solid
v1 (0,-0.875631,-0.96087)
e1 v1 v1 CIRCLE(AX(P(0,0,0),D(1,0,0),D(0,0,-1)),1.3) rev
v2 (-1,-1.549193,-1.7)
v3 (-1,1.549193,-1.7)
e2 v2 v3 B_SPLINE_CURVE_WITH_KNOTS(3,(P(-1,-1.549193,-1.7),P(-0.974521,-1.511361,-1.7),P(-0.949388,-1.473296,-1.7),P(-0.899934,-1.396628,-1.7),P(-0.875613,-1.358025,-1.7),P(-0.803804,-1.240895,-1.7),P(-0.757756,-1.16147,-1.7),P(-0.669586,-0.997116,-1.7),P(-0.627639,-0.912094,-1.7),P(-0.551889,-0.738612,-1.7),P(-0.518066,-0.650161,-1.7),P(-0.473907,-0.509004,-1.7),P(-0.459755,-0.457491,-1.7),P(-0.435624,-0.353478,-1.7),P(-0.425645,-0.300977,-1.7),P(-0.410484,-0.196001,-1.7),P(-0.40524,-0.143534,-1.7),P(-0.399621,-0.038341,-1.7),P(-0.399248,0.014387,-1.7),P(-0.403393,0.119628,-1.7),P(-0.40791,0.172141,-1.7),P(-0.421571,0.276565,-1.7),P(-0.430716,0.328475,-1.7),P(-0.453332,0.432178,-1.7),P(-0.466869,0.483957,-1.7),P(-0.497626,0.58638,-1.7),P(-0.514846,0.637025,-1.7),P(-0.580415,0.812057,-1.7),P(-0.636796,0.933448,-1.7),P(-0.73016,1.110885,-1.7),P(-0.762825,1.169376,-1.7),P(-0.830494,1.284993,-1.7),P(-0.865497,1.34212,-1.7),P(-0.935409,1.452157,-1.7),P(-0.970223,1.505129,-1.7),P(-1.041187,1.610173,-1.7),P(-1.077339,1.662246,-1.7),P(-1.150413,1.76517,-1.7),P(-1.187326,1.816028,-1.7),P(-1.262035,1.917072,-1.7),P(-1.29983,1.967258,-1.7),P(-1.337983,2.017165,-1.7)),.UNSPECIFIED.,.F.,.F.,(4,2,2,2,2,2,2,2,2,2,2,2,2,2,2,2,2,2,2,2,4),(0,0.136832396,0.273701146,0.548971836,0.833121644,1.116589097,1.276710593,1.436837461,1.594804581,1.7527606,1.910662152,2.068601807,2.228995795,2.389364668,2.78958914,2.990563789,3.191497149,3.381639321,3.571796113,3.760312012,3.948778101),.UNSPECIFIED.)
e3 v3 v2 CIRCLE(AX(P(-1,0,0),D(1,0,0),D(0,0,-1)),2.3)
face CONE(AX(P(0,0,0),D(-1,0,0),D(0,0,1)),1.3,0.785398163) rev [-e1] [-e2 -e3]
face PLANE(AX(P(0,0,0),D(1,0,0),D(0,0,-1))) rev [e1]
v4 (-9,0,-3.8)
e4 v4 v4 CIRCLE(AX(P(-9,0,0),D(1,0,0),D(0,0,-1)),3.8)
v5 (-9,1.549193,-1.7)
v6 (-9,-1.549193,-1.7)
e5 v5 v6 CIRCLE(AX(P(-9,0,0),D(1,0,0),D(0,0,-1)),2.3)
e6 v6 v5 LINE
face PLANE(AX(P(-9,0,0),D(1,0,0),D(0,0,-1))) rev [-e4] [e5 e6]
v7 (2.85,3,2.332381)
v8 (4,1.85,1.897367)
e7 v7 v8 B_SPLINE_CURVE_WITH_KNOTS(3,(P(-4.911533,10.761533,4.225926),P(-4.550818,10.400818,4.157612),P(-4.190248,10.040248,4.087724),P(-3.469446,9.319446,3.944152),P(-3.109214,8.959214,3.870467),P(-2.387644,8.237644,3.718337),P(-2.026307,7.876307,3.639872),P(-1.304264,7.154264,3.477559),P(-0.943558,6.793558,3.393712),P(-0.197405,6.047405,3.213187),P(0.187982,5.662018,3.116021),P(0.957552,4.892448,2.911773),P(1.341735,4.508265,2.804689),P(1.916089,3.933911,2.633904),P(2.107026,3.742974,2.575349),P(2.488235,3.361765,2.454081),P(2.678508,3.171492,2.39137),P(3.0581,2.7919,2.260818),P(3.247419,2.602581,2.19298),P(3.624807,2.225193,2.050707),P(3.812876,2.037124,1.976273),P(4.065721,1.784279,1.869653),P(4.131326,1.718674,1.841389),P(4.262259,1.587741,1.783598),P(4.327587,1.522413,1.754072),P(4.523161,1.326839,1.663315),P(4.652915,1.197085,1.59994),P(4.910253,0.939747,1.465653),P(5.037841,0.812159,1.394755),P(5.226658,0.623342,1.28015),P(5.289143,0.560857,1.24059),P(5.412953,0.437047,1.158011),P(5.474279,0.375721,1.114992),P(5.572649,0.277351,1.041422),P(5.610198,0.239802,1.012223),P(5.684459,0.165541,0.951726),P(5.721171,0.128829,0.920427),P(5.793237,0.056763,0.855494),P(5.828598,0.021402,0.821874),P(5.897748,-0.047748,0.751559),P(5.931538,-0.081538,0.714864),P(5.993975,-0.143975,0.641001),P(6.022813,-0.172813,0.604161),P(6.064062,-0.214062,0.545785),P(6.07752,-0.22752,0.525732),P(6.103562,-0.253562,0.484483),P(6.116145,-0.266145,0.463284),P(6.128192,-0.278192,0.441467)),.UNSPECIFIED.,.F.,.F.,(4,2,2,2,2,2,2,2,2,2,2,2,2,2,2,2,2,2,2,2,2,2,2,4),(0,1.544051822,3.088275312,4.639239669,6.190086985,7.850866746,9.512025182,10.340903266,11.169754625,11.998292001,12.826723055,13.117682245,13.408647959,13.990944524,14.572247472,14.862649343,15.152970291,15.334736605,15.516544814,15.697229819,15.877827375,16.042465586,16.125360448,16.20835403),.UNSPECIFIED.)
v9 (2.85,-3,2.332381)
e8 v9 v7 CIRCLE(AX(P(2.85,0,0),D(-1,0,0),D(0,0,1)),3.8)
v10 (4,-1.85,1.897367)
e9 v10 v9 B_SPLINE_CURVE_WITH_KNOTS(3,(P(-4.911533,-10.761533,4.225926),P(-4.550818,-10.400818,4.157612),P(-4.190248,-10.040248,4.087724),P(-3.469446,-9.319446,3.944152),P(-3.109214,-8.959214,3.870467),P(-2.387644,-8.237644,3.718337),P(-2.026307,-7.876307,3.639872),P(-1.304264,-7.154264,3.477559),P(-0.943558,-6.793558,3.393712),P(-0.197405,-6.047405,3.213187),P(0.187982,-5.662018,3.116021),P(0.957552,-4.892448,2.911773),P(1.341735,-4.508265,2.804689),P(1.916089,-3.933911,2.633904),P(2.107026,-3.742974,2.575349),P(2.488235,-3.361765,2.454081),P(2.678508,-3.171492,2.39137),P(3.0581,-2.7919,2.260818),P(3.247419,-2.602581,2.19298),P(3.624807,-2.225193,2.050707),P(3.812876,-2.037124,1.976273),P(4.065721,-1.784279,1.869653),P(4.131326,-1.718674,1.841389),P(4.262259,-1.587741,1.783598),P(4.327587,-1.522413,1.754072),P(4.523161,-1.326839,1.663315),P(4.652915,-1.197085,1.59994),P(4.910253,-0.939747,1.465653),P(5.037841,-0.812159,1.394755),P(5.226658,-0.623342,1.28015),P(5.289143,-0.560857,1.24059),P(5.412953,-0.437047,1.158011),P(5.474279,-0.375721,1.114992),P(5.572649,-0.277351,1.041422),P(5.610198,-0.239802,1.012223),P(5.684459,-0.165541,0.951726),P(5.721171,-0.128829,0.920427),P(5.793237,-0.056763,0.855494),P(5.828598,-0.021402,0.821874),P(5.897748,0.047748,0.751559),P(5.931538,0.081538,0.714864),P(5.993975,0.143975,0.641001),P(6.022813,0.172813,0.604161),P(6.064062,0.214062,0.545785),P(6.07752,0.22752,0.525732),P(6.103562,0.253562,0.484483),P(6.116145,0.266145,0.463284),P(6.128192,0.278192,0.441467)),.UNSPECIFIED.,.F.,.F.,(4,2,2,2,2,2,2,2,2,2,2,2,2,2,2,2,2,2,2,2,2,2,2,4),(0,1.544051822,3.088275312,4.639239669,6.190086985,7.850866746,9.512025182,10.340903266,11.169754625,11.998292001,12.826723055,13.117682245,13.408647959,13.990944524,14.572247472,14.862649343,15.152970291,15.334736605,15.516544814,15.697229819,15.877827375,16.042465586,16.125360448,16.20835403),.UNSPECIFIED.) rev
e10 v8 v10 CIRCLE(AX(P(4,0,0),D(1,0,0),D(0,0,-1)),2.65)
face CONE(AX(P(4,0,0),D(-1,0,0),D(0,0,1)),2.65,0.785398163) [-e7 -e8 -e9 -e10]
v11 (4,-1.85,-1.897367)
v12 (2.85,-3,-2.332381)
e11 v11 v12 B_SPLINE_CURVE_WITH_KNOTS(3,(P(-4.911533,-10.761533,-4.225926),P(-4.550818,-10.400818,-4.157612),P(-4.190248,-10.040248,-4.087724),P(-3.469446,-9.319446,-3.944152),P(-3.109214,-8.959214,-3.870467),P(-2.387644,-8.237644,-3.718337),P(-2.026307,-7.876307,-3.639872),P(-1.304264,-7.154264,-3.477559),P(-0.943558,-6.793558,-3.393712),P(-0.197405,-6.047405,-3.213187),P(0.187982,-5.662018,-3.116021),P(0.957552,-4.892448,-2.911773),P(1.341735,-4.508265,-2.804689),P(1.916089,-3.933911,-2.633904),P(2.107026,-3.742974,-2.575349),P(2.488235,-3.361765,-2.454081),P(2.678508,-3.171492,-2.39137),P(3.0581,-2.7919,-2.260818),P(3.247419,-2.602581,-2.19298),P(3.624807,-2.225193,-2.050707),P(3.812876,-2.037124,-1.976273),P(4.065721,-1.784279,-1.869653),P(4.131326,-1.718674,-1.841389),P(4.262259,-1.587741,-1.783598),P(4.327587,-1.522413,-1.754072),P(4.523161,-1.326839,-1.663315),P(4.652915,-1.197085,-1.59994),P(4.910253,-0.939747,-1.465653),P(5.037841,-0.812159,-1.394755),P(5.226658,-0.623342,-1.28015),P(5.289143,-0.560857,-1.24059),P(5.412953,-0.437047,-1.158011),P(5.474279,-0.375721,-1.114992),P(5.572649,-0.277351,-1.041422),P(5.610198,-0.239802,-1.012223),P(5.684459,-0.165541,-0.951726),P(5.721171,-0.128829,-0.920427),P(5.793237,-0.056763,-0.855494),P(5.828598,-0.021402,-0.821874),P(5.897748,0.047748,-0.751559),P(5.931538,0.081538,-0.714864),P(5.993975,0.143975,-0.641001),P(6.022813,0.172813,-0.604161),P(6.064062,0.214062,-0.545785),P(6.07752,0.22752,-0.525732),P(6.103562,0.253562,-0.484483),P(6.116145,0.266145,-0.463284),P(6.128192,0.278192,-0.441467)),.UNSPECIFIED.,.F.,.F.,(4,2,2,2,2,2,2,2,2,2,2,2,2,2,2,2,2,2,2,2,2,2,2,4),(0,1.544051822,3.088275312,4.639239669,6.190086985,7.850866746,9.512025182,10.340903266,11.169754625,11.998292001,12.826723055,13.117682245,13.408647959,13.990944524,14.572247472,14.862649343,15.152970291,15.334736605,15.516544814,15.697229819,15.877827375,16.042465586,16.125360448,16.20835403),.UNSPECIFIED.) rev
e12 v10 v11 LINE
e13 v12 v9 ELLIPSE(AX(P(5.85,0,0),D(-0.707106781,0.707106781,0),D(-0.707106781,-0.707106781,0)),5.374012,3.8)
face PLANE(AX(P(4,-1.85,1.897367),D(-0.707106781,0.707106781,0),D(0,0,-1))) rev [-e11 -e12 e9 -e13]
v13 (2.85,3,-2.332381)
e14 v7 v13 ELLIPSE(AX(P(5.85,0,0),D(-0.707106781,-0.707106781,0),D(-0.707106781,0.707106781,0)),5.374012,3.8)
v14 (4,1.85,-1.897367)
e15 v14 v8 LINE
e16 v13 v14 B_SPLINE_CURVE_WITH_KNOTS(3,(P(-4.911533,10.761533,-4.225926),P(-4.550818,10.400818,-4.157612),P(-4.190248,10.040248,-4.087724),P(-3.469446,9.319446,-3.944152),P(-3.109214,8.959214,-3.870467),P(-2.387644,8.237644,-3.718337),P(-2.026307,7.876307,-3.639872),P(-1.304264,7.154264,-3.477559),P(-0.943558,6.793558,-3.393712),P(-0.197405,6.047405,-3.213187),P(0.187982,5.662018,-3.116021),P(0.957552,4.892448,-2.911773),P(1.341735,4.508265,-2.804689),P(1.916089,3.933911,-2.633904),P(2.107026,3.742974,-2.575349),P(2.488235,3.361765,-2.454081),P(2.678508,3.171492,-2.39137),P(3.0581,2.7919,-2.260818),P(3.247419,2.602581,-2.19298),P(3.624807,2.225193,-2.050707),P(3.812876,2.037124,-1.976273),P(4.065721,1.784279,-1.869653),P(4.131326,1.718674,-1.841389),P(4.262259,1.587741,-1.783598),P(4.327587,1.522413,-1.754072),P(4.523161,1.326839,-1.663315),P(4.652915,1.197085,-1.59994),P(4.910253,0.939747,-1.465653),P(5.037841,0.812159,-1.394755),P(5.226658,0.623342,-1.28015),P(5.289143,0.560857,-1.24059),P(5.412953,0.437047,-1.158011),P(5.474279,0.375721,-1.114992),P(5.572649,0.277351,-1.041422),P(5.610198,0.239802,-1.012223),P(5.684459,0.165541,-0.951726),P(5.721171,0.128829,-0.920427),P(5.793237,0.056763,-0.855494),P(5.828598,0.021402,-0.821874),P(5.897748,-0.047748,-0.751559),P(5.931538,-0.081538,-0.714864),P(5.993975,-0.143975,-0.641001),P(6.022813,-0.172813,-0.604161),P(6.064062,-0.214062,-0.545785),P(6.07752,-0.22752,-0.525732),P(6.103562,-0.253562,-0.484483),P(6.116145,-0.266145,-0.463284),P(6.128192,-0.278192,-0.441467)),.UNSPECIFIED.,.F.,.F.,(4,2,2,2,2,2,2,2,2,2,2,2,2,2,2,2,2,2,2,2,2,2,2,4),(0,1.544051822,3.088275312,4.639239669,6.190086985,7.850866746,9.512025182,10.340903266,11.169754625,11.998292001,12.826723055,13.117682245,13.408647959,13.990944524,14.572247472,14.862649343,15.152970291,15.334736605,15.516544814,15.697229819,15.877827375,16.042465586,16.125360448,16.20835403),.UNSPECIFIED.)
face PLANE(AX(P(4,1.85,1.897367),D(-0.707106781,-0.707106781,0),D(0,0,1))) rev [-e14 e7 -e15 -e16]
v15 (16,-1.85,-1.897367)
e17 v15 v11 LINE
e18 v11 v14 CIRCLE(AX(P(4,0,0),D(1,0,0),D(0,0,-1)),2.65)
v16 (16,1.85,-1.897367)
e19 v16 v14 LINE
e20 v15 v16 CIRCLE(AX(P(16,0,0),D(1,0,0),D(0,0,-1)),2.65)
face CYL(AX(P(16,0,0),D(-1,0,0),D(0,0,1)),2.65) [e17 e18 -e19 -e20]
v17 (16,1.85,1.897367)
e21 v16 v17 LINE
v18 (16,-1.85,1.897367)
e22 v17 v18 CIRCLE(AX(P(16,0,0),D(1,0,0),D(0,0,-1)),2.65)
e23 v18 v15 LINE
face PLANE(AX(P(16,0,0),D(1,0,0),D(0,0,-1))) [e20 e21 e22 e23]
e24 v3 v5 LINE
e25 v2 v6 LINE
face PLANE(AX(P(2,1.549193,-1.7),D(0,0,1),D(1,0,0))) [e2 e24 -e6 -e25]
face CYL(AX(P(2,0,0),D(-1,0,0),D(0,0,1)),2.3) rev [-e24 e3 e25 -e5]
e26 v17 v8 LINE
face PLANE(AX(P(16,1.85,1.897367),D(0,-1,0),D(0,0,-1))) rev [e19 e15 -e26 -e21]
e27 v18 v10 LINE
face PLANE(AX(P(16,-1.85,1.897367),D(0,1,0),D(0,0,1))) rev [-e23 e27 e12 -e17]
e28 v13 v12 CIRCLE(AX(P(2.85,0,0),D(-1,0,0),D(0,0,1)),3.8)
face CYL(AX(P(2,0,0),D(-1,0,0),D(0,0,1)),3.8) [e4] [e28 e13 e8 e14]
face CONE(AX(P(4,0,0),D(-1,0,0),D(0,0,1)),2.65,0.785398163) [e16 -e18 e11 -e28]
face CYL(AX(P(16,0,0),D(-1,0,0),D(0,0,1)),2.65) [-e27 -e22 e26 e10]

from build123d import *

# Parameters (mm, degrees)
SALIENTE_EXTRUIR1_DEPTH      = 16
SALIENTE_EXTRUIR2_DEPTH      = 2
SALIENTE_EXTRUIR2_DEPTH_BACK = 9
CROQUIS2_R                   = 3.8
SALIENTE_EXTRUIR3_DEPTH      = 2
CHAFL_N1_SIZE                = 2


with BuildPart() as part:
    # Croquis1 → Saliente-Extruir1 (new body)
    with BuildSketch(Plane(origin=(0, 0, 0), x_dir=(0, 0, -1), z_dir=(1, 0, 0))):
        with BuildLine():
            Line((-1.897366596, 1.85), (1.897366596, 1.85))
            ThreePointArc((1.897366596, 1.85), (2.65, 0), (1.897366596, -1.85))
            Line((1.897366596, -1.85), (-1.897366596, -1.85))
            ThreePointArc((-1.897366596, -1.85), (-2.65, 0), (-1.897366596, 1.85))
        make_face()
    extrude(amount=SALIENTE_EXTRUIR1_DEPTH)

    # Croquis2 → Saliente-Extruir2 (add, two sides: drawn at the far end of the back side and taken through both)
    with BuildSketch(Plane(origin=(0, 0, 0), x_dir=(0, 0, -1), z_dir=(1, 0, 0)).offset(-SALIENTE_EXTRUIR2_DEPTH_BACK)):
        Circle(CROQUIS2_R)
        with BuildLine():
            Line((1.7, 1.549193338), (1.7, -1.549193338))
            ThreePointArc((1.7, -1.549193338), (-2.3, 0), (1.7, 1.549193338))
        make_face(mode=Mode.SUBTRACT)
    extrude(amount=SALIENTE_EXTRUIR2_DEPTH + SALIENTE_EXTRUIR2_DEPTH_BACK)

    # Croquis3 → Saliente-Extruir3 (add)
    with BuildSketch(Plane(origin=(0, 0, 0), x_dir=(0, 0, -1), z_dir=(1, 0, 0))):
        with BuildLine():
            Line((-1.897366596, 1.85), (1.897366596, 1.85))
            ThreePointArc((1.897366596, 1.85), (0, 2.65), (-1.897366596, 1.85))
        make_face()
        with BuildLine():
            Line((-1.897366596, -1.85), (1.897366596, -1.85))
            ThreePointArc((1.897366596, -1.85), (0, -2.65), (-1.897366596, -1.85))
        make_face()
    extrude(amount=SALIENTE_EXTRUIR3_DEPTH)

    # Chaflán1
    # the kernel refuses this chamfer: 2 mm, written as the material it adds along each edge
    with BuildSketch(Plane(origin=(2, 0, 0), x_dir=(0, 0.4143114997605186, 0.91013514445174), z_dir=(0, -0.91013514445174, 0.4143114997605186))) as chafl_n1_piece_1_section:
        Polygon((2.65, -CHAFL_N1_SIZE), (2.65 + CHAFL_N1_SIZE, 0), (2.65, 0), align=None)
    chafl_n1_piece_1 = revolve(axis=Axis((2, 0, 0), (-1, 0, 0)), revolution_arc=311.048068347, mode=Mode.PRIVATE)
    chafl_n1_piece_1 = split(chafl_n1_piece_1, bisect_by=Plane(origin=(2, 1.85, 0), z_dir=(0, -1, 0)), keep=Keep.TOP, mode=Mode.PRIVATE)
    chafl_n1_piece_1 = split(chafl_n1_piece_1, bisect_by=Plane(origin=(2, -1.85, 0), z_dir=(0, 1, 0)), keep=Keep.TOP, mode=Mode.PRIVATE)
    chafl_n1_piece_1 = chafl_n1_piece_1 & Plane(origin=(2, 0, 0), x_dir=(0, 0, -1), z_dir=(-1, 0, 0)) * Cylinder(3.8, 19, mode=Mode.PRIVATE)
    add(chafl_n1_piece_1)
    with BuildSketch(Plane(origin=(2, -1.85, -7.040732572), x_dir=(1, 0, 0), z_dir=(0, 0, 1))) as chafl_n1_piece_2_section:
        Polygon((CHAFL_N1_SIZE, 0), (0, -CHAFL_N1_SIZE), (0, 0), align=None)
    chafl_n1_piece_2 = extrude(amount=14.081465144, mode=Mode.PRIVATE)
    chafl_n1_piece_2 = chafl_n1_piece_2 & Plane(origin=(2, 0, 0), x_dir=(0, 0.6981132075471701, -0.7159873947551046), z_dir=(-1, 0, 0)) * Cylinder(2.65, 37, mode=Mode.PRIVATE)
    add(chafl_n1_piece_2)
    with BuildSketch(Plane(origin=(2, 0, 0), x_dir=(0, -0.4143114997605186, -0.91013514445174), z_dir=(0, 0.91013514445174, -0.4143114997605186))) as chafl_n1_piece_3_section:
        Polygon((2.65, -CHAFL_N1_SIZE), (2.65 + CHAFL_N1_SIZE, 0), (2.65, 0), align=None)
    chafl_n1_piece_3 = revolve(axis=Axis((2, 0, 0), (-1, 0, 0)), revolution_arc=311.048068347, mode=Mode.PRIVATE)
    chafl_n1_piece_3 = split(chafl_n1_piece_3, bisect_by=Plane(origin=(2, 1.85, 0), z_dir=(0, -1, 0)), keep=Keep.TOP, mode=Mode.PRIVATE)
    chafl_n1_piece_3 = split(chafl_n1_piece_3, bisect_by=Plane(origin=(2, -1.85, 0), z_dir=(0, 1, 0)), keep=Keep.TOP, mode=Mode.PRIVATE)
    chafl_n1_piece_3 = chafl_n1_piece_3 & Plane(origin=(2, 0, 0), x_dir=(0, 0, -1), z_dir=(-1, 0, 0)) * Cylinder(3.8, 19, mode=Mode.PRIVATE)
    add(chafl_n1_piece_3)
    with BuildSketch(Plane(origin=(2, 1.85, -7.040732572), x_dir=(1, 0, 0), z_dir=(0, 0, 1))) as chafl_n1_piece_4_section:
        Polygon((CHAFL_N1_SIZE, 0), (0, CHAFL_N1_SIZE), (0, 0), align=None)
    chafl_n1_piece_4 = extrude(amount=14.081465144, mode=Mode.PRIVATE)
    chafl_n1_piece_4 = chafl_n1_piece_4 & Plane(origin=(2, 0, 0), x_dir=(0, -0.6981132075471701, 0.7159873947551046), z_dir=(-1, 0, 0)) * Cylinder(2.65, 37, mode=Mode.PRIVATE)
    add(chafl_n1_piece_4)
    with BuildSketch(Plane(origin=(2, 1.85, -7.040732572), x_dir=(1, 0, 0), z_dir=(0, 0, 1))) as chafl_n1_piece_5a_section:
        Polygon((CHAFL_N1_SIZE, 0), (0, CHAFL_N1_SIZE), (0, 0), align=None)
    chafl_n1_piece_5a = extrude(amount=14.081465144, mode=Mode.PRIVATE)
    chafl_n1_piece_5a = chafl_n1_piece_5a - Plane(origin=(2, 0, 0), x_dir=(0, -0.6981132075471701, 0.7159873947551046), z_dir=(-1, 0, 0)) * Cylinder(2.65, 37, mode=Mode.PRIVATE)
    chafl_n1_piece_5a = chafl_n1_piece_5a & Plane(origin=(2, 0, 0), x_dir=(0, 0, -1), z_dir=(-1, 0, 0)) * Cylinder(3.8, 37, mode=Mode.PRIVATE)
    with BuildSketch(Plane(origin=(2, 0, 0), x_dir=(0, 0.4143114997605186, 0.91013514445174), z_dir=(0, -0.91013514445174, 0.4143114997605186))) as chafl_n1_piece_5b_section:
        Polygon((2.65, -CHAFL_N1_SIZE), (2.65 + CHAFL_N1_SIZE, 0), (2.65, 0), align=None)
    chafl_n1_piece_5b = revolve(axis=Axis((2, 0, 0), (-1, 0, 0)), revolution_arc=311.048068347, mode=Mode.PRIVATE)
    chafl_n1_piece_5b = split(chafl_n1_piece_5b, bisect_by=Plane(origin=(2, 1.85, 0), z_dir=(0, 1, 0)), keep=Keep.TOP, mode=Mode.PRIVATE)
    chafl_n1_piece_5b = chafl_n1_piece_5b & Plane(origin=(2, 0, 0), x_dir=(0, 0, -1), z_dir=(-1, 0, 0)) * Cylinder(3.8, 19, mode=Mode.PRIVATE)
    chafl_n1_piece_5 = chafl_n1_piece_5a & chafl_n1_piece_5b
    add(chafl_n1_piece_5)
    with BuildSketch(Plane(origin=(2, 0, 0), x_dir=(0, 0.4143114997605186, 0.91013514445174), z_dir=(0, -0.91013514445174, 0.4143114997605186))) as chafl_n1_piece_6a_section:
        Polygon((2.65, -CHAFL_N1_SIZE), (2.65 + CHAFL_N1_SIZE, 0), (2.65, 0), align=None)
    chafl_n1_piece_6a = revolve(axis=Axis((2, 0, 0), (-1, 0, 0)), revolution_arc=311.048068347, mode=Mode.PRIVATE)
    chafl_n1_piece_6a = split(chafl_n1_piece_6a, bisect_by=Plane(origin=(2, -1.85, 0), z_dir=(0, -1, 0)), keep=Keep.TOP, mode=Mode.PRIVATE)
    chafl_n1_piece_6a = chafl_n1_piece_6a & Plane(origin=(2, 0, 0), x_dir=(0, 0, -1), z_dir=(-1, 0, 0)) * Cylinder(3.8, 19, mode=Mode.PRIVATE)
    with BuildSketch(Plane(origin=(2, -1.85, -7.040732572), x_dir=(1, 0, 0), z_dir=(0, 0, 1))) as chafl_n1_piece_6b_section:
        Polygon((CHAFL_N1_SIZE, 0), (0, -CHAFL_N1_SIZE), (0, 0), align=None)
    chafl_n1_piece_6b = extrude(amount=14.081465144, mode=Mode.PRIVATE)
    chafl_n1_piece_6b = chafl_n1_piece_6b - Plane(origin=(2, 0, 0), x_dir=(0, 0.6981132075471701, -0.7159873947551046), z_dir=(-1, 0, 0)) * Cylinder(2.65, 37, mode=Mode.PRIVATE)
    chafl_n1_piece_6b = chafl_n1_piece_6b & Plane(origin=(2, 0, 0), x_dir=(0, 0, -1), z_dir=(-1, 0, 0)) * Cylinder(3.8, 37, mode=Mode.PRIVATE)
    chafl_n1_piece_6 = chafl_n1_piece_6a & chafl_n1_piece_6b
    add(chafl_n1_piece_6)
    with BuildSketch(Plane(origin=(2, -1.85, -7.040732572), x_dir=(1, 0, 0), z_dir=(0, 0, 1))) as chafl_n1_piece_7a_section:
        Polygon((CHAFL_N1_SIZE, 0), (0, -CHAFL_N1_SIZE), (0, 0), align=None)
    chafl_n1_piece_7a = extrude(amount=14.081465144, mode=Mode.PRIVATE)
    chafl_n1_piece_7a = chafl_n1_piece_7a - Plane(origin=(2, 0, 0), x_dir=(0, 0.6981132075471701, -0.7159873947551046), z_dir=(-1, 0, 0)) * Cylinder(2.65, 37, mode=Mode.PRIVATE)
    chafl_n1_piece_7a = chafl_n1_piece_7a & Plane(origin=(2, 0, 0), x_dir=(0, 0, -1), z_dir=(-1, 0, 0)) * Cylinder(3.8, 37, mode=Mode.PRIVATE)
    with BuildSketch(Plane(origin=(2, 0, 0), x_dir=(0, -0.4143114997605186, -0.91013514445174), z_dir=(0, 0.91013514445174, -0.4143114997605186))) as chafl_n1_piece_7b_section:
        Polygon((2.65, -CHAFL_N1_SIZE), (2.65 + CHAFL_N1_SIZE, 0), (2.65, 0), align=None)
    chafl_n1_piece_7b = revolve(axis=Axis((2, 0, 0), (-1, 0, 0)), revolution_arc=311.048068347, mode=Mode.PRIVATE)
    chafl_n1_piece_7b = split(chafl_n1_piece_7b, bisect_by=Plane(origin=(2, -1.85, 0), z_dir=(0, -1, 0)), keep=Keep.TOP, mode=Mode.PRIVATE)
    chafl_n1_piece_7b = chafl_n1_piece_7b & Plane(origin=(2, 0, 0), x_dir=(0, 0, -1), z_dir=(-1, 0, 0)) * Cylinder(3.8, 19, mode=Mode.PRIVATE)
    chafl_n1_piece_7 = chafl_n1_piece_7a & chafl_n1_piece_7b
    add(chafl_n1_piece_7)
    with BuildSketch(Plane(origin=(2, 1.85, -7.040732572), x_dir=(1, 0, 0), z_dir=(0, 0, 1))) as chafl_n1_piece_8a_section:
        Polygon((CHAFL_N1_SIZE, 0), (0, CHAFL_N1_SIZE), (0, 0), align=None)
    chafl_n1_piece_8a = extrude(amount=14.081465144, mode=Mode.PRIVATE)
    chafl_n1_piece_8a = chafl_n1_piece_8a - Plane(origin=(2, 0, 0), x_dir=(0, -0.6981132075471701, 0.7159873947551046), z_dir=(-1, 0, 0)) * Cylinder(2.65, 37, mode=Mode.PRIVATE)
    chafl_n1_piece_8a = chafl_n1_piece_8a & Plane(origin=(2, 0, 0), x_dir=(0, 0, -1), z_dir=(-1, 0, 0)) * Cylinder(3.8, 37, mode=Mode.PRIVATE)
    with BuildSketch(Plane(origin=(2, 0, 0), x_dir=(0, -0.4143114997605186, -0.91013514445174), z_dir=(0, 0.91013514445174, -0.4143114997605186))) as chafl_n1_piece_8b_section:
        Polygon((2.65, -CHAFL_N1_SIZE), (2.65 + CHAFL_N1_SIZE, 0), (2.65, 0), align=None)
    chafl_n1_piece_8b = revolve(axis=Axis((2, 0, 0), (-1, 0, 0)), revolution_arc=311.048068347, mode=Mode.PRIVATE)
    chafl_n1_piece_8b = split(chafl_n1_piece_8b, bisect_by=Plane(origin=(2, 1.85, 0), z_dir=(0, 1, 0)), keep=Keep.TOP, mode=Mode.PRIVATE)
    chafl_n1_piece_8b = chafl_n1_piece_8b & Plane(origin=(2, 0, 0), x_dir=(0, 0, -1), z_dir=(-1, 0, 0)) * Cylinder(3.8, 19, mode=Mode.PRIVATE)
    chafl_n1_piece_8 = chafl_n1_piece_8a & chafl_n1_piece_8b
    add(chafl_n1_piece_8)

    # Chaflán2: read off the stored shape, not the designer's step
    # Chaflán2 outline → Chaflán2 (revolve)
    with BuildSketch(Plane.YX):
        Polygon((2.3, 0), (1.3, 0), (2.3, -1), align=None)
    revolve(axis=Axis((0, 0, 0), (1, 0, 0)))


solid = part.part
